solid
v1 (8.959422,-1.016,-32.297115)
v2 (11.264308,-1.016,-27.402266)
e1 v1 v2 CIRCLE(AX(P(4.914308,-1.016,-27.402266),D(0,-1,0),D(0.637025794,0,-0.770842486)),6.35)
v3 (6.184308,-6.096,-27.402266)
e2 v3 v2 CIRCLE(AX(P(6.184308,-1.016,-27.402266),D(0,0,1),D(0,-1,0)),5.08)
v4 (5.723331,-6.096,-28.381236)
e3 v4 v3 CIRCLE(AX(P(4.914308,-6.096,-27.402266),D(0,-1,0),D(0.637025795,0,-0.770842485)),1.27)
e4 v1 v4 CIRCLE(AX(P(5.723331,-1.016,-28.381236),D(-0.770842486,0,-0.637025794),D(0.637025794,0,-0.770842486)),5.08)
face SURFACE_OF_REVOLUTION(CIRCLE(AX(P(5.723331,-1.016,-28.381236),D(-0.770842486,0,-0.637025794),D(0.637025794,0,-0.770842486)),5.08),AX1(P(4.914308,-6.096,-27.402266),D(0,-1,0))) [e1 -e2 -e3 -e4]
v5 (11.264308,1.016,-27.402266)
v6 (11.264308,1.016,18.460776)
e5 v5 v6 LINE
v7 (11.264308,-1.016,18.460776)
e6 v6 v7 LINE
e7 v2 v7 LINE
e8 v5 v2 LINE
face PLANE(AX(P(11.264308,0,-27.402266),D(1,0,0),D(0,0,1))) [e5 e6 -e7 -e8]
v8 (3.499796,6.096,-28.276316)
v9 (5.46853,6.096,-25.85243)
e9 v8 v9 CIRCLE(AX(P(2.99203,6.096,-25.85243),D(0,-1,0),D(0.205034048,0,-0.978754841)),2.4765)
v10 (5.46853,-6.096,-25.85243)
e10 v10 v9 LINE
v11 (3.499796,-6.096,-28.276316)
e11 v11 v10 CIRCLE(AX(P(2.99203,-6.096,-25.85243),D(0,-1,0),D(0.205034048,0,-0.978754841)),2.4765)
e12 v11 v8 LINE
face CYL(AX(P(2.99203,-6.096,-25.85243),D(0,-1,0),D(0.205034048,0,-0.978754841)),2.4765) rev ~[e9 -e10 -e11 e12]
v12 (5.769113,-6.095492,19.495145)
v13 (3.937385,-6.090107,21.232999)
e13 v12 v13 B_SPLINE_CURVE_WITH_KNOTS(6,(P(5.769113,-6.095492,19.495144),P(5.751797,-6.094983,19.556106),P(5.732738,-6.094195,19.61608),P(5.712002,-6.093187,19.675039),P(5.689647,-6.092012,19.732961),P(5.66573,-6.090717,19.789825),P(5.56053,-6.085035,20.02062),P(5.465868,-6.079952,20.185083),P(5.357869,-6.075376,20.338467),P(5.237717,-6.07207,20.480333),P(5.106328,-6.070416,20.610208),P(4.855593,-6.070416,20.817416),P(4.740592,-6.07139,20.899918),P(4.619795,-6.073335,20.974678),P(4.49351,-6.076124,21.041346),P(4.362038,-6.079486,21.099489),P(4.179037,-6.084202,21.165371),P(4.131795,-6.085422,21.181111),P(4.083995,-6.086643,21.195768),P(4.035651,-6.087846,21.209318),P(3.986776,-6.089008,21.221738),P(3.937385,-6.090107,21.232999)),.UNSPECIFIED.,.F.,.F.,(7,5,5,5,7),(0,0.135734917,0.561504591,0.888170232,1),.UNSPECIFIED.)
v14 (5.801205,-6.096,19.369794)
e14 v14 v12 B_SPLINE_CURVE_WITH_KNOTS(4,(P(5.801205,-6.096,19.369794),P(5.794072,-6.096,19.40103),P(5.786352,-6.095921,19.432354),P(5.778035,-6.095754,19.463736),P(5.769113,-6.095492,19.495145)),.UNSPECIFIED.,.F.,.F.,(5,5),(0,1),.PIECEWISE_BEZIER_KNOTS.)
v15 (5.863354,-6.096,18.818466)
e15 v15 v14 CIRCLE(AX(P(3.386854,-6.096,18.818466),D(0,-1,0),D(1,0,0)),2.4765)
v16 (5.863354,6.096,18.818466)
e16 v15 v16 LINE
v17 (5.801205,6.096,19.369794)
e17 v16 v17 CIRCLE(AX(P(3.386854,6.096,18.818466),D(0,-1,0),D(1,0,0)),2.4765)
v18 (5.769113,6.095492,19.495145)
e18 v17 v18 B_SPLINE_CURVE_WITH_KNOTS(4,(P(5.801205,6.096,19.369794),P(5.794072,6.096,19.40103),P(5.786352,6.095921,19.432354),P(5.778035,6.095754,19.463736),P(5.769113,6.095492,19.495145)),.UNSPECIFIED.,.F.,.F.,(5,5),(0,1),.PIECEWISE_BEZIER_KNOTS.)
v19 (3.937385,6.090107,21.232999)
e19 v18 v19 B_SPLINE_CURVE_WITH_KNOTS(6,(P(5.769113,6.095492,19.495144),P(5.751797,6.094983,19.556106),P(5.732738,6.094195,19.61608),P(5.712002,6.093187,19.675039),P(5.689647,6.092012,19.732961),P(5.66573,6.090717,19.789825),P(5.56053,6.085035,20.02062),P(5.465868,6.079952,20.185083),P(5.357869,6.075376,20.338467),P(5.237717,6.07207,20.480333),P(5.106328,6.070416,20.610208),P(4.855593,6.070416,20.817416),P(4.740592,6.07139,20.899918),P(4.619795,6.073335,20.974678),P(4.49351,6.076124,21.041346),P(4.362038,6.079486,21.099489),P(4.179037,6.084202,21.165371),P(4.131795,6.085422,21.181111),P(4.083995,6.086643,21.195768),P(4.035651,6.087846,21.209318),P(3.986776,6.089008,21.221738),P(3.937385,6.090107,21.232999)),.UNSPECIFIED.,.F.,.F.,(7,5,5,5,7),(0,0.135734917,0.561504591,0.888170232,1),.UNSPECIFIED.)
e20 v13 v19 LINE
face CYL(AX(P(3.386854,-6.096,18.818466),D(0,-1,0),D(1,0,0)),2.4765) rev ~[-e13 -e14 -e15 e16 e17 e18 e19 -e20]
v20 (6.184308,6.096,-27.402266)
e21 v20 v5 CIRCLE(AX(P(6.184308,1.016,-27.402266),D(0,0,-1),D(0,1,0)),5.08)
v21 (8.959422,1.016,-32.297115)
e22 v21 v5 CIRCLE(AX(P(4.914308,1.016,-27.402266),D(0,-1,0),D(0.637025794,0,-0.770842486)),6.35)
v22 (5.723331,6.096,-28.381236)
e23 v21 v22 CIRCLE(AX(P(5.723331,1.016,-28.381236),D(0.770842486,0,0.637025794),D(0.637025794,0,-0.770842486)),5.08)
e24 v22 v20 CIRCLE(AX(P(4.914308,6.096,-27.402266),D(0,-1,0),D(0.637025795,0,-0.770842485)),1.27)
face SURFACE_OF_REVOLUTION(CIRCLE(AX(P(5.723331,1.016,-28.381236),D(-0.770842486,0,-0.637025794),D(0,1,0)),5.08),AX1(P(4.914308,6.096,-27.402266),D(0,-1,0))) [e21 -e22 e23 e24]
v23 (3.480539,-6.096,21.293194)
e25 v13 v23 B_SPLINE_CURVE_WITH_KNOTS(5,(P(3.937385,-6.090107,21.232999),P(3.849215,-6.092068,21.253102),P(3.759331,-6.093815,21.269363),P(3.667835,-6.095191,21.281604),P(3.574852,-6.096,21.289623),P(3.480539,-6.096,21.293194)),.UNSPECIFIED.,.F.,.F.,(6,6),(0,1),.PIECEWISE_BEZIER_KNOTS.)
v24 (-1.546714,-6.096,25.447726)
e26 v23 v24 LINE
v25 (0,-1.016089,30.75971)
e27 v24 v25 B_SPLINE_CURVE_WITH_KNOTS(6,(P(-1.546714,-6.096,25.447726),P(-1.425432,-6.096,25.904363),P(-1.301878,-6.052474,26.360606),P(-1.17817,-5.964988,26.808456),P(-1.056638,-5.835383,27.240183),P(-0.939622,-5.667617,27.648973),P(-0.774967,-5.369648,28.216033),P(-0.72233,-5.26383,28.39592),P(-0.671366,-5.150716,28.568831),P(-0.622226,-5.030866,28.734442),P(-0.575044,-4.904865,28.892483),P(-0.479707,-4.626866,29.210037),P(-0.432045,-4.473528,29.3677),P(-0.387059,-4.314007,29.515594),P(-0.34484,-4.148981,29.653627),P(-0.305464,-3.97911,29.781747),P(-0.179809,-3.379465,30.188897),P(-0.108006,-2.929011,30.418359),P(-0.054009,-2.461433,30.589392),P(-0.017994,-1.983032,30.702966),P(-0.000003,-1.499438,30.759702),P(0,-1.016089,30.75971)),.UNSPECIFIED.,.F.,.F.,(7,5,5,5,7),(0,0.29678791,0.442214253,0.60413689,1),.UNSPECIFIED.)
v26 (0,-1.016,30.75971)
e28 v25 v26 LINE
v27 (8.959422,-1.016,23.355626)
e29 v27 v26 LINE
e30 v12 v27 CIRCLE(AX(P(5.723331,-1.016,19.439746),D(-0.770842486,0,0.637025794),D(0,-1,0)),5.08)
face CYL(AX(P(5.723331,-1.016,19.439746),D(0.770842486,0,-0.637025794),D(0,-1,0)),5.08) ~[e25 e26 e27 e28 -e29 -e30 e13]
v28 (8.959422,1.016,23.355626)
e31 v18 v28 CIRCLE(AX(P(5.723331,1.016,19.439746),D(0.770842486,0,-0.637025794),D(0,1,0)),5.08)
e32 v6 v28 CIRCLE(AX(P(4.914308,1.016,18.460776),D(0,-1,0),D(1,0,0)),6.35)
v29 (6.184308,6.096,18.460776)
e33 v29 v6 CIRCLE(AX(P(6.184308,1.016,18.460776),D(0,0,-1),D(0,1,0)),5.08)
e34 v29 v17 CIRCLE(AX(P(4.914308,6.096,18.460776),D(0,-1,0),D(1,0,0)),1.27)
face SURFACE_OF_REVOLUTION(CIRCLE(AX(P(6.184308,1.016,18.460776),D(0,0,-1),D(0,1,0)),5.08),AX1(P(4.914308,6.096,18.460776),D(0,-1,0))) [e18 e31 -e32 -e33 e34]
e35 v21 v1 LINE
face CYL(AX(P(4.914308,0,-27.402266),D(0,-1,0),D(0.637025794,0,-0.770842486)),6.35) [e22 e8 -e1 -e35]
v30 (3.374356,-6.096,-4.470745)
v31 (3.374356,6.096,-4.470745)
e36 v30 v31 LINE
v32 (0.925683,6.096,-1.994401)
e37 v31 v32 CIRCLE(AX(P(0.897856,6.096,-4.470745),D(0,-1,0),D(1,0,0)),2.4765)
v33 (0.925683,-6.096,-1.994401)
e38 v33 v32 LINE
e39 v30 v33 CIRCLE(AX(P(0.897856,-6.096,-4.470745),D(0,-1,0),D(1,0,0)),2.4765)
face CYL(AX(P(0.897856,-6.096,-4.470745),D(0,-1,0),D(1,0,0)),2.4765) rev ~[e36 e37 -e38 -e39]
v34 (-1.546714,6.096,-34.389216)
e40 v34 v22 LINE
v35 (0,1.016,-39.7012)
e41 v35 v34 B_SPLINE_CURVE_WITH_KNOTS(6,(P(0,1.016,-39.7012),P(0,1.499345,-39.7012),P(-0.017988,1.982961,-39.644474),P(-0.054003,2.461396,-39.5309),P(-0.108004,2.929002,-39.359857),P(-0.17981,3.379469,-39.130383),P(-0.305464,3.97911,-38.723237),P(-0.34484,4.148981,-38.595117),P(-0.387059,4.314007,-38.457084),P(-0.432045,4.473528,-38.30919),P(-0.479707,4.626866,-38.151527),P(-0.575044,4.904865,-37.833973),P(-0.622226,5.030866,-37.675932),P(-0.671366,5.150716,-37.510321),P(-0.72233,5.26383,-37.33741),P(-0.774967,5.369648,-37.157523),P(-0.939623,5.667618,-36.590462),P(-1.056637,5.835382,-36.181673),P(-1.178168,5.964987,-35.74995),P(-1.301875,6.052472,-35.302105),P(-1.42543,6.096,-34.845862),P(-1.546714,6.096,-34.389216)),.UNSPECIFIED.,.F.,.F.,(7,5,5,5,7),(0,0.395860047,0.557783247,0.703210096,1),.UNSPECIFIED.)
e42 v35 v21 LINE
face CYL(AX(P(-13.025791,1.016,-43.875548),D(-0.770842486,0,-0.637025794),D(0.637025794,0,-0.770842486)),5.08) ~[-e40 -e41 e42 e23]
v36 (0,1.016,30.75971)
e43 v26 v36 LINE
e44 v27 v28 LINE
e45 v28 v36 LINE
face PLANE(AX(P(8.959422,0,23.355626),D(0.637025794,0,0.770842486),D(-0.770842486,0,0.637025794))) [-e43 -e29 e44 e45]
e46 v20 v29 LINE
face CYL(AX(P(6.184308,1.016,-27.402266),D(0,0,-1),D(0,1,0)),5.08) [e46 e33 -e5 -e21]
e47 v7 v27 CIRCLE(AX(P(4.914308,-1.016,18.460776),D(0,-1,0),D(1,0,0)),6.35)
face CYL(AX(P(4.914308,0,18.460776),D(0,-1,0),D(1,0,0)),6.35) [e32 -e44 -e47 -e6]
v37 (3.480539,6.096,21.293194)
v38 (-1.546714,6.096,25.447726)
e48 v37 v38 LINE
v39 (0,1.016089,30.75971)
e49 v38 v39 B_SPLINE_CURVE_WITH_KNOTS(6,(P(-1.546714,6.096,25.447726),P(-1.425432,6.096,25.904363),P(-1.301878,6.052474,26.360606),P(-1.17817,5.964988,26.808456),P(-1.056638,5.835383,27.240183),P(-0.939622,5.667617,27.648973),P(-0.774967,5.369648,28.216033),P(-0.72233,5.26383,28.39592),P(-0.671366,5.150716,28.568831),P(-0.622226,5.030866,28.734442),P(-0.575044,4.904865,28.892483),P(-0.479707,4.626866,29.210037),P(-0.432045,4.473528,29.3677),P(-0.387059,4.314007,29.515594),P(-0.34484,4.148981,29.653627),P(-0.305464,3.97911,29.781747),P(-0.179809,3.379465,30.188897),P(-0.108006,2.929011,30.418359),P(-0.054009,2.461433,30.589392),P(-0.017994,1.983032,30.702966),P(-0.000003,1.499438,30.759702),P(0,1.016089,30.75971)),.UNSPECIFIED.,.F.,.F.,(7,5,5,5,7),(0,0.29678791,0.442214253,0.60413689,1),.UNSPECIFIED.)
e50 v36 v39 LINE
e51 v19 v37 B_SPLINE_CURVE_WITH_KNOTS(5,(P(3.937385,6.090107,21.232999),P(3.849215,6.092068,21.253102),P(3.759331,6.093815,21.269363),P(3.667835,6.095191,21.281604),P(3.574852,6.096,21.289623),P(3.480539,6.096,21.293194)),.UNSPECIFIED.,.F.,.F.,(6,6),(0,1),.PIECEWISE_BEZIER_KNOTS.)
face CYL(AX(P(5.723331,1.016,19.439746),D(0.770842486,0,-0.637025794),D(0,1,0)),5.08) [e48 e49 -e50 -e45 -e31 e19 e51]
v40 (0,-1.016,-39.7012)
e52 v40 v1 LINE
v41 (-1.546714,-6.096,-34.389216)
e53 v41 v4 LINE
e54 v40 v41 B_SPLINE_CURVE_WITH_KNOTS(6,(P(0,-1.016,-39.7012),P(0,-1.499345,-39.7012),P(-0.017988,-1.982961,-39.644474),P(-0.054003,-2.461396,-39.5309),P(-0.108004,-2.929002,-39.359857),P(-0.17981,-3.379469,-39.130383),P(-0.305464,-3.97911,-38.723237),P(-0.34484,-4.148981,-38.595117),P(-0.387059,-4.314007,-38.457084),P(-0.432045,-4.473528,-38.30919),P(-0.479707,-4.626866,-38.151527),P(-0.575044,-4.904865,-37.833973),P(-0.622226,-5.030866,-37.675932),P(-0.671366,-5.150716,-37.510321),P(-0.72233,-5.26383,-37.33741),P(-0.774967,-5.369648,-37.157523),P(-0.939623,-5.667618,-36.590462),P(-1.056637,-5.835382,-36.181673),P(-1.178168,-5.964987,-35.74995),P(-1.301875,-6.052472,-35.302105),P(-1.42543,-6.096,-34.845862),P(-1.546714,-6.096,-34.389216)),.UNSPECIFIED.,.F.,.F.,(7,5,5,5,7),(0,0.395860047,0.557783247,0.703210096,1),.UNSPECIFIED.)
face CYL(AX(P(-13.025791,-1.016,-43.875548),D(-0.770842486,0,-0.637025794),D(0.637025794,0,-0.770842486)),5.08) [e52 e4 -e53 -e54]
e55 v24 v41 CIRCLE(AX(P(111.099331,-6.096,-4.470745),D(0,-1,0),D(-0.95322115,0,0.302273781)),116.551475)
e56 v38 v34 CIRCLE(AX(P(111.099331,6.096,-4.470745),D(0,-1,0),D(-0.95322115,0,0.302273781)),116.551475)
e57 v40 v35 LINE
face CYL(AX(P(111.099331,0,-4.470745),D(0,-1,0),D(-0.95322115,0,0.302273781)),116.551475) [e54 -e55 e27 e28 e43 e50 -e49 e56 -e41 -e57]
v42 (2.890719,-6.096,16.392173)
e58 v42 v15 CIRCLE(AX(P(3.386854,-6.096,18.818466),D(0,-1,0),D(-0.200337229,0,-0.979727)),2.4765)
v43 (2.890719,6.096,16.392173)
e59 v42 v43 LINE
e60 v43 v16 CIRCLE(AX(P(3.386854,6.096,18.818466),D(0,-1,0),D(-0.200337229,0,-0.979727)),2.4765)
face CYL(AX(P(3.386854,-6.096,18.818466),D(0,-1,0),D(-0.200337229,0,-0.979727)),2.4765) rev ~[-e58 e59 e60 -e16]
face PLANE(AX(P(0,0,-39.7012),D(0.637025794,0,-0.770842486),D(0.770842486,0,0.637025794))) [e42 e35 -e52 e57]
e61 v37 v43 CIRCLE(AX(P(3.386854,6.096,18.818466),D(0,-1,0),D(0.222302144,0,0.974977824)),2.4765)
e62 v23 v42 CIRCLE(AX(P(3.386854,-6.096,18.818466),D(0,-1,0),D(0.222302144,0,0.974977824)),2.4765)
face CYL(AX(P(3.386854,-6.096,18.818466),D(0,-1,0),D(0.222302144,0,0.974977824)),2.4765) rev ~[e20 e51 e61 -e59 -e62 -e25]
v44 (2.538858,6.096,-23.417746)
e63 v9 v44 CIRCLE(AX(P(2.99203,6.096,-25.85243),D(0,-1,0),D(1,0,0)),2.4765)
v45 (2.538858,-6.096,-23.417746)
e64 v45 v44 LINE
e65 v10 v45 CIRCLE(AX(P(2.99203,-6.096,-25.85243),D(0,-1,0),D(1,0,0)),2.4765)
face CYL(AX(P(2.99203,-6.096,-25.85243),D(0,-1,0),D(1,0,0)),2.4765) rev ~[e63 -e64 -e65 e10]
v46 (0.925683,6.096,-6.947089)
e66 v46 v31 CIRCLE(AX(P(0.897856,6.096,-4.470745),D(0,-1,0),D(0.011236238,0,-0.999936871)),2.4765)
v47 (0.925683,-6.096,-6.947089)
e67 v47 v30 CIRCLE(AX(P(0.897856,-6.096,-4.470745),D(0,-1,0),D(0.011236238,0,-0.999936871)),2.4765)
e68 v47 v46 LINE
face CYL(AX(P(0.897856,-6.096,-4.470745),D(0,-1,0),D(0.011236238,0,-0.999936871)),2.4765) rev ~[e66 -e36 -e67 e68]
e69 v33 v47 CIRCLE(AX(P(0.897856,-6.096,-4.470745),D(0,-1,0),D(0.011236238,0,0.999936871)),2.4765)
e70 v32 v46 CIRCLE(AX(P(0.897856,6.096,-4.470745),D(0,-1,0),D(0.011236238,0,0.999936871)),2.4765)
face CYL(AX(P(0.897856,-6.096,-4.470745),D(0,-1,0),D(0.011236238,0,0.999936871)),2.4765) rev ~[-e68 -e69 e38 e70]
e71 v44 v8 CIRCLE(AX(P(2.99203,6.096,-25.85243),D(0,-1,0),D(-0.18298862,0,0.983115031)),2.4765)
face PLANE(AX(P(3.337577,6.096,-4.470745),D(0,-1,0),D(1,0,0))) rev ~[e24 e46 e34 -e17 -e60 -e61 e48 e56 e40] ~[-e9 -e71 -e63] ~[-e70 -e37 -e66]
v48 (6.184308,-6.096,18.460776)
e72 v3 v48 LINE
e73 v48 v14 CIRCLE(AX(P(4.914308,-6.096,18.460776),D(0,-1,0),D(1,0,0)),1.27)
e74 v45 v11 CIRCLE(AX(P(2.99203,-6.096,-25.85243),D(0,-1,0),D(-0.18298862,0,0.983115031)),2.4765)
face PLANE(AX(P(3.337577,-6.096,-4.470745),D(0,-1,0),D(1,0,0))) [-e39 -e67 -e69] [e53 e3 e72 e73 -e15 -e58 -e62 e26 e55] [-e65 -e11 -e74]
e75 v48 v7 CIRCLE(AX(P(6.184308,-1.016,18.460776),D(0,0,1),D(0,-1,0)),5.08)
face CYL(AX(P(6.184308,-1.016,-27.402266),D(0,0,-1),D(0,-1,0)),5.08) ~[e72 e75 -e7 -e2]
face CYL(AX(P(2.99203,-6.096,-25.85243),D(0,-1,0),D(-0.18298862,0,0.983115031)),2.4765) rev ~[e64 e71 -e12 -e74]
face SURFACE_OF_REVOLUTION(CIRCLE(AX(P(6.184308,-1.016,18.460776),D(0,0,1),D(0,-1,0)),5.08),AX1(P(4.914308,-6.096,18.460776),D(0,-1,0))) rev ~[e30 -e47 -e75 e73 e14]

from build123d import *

# Parameters (mm, degrees)
F1_DEPTH     = 6.096
F3_DEPTH     = 25.4
F4_T1_DEPTH  = 45.8630415712
F4_T3_DEPTH  = 24.3228960689
F4_T5_DEPTH  = 24.3228960689
F4_T8_ANGLE  = 50.429603728
F4_T10_ANGLE = 50.429603728
F4_T12_ANGLE = 50.429603728
F4_T14_ANGLE = 50.429603728


# Not quite as in the source:
# - a fillet or chamfer that OpenCascade refuses, or shapes differently, is made with other operations: its cross-section is extruded or revolved along the edge and cut away or added


with BuildPart() as f1:
    # F0 (on Front) → F1 (new body, symmetric)
    with BuildSketch(Plane.XZ):
        with BuildLine():
            Line((0, -39.7012000674), (8.9594220974, -32.2971154711))
            ThreePointArc((8.9594220974, -32.2971154711), (10.6592614203, -30.1074484367), (11.2643083058, -27.4022656866))
            Line((11.2643083058, -27.4022656866), (11.2643083058, 18.4607758846))
            ThreePointArc((11.2643083058, 18.4607758846), (10.6592614203, 21.1659586348), (8.9594220974, 23.3556256691))
            Line((8.9594220974, 23.3556256691), (0, 30.7597102655))
            ThreePointArc((0, 30.7597102655), (-5.4521439637, -4.470744901), (0, -39.7012000674))
        make_face()
    extrude(amount=F1_DEPTH, both=True)

    # F2 (on face) → F3 (cut)
    with BuildSketch(Plane.XZ.offset(6.096)):
        with BuildLine():
            ThreePointArc((5.8633539044, 18.8184664851), (5.322886305, 20.3627562227), (3.9373851632, 21.2329990657))
            ThreePointArc((3.9373851632, 21.2329990657), (3.3868539044, 18.8184664851), (2.8907187579, 16.3921725692))
            ThreePointArc((2.8907187579, 16.3921725692), (4.9527998741, 16.8999083103), (5.8633539044, 18.8184664851))
        make_face()
        with BuildLine():
            ThreePointArc((5.4685295173, -25.8524299357), (4.5748708681, -23.9477867911), (2.5388582003, -23.4177455604))
            ThreePointArc((2.5388582003, -23.4177455604), (2.9920295173, -25.8524299357), (3.4997963379, -28.2763162998))
            ThreePointArc((3.4997963379, -28.2763162998), (4.9143376067, -27.4137703405), (5.4685295173, -25.8524299357))
        make_face()
        with BuildLine():
            ThreePointArc((3.4997963379, -28.2763162998), (2.9920295173, -25.8524299357), (2.5388582003, -23.4177455604))
            ThreePointArc((2.5388582003, -23.4177455604), (0.5625907808, -26.3329293377), (3.4997963379, -28.2763162998))
        make_face()
        with BuildLine():
            ThreePointArc((3.3743560218, -4.470744901), (2.6588166523, -2.7294609185), (0.9256825651, -1.9944012387))
            ThreePointArc((0.9256825651, -1.9944012387), (0.8978560218, -4.470744901), (0.9256825651, -6.9470885632))
            ThreePointArc((0.9256825651, -6.9470885632), (2.6588166523, -6.2120288835), (3.3743560218, -4.470744901))
        make_face()
        with BuildLine():
            ThreePointArc((0.9256825651, -6.9470885632), (0.8978560218, -4.470744901), (0.9256825651, -1.9944012387))
            ThreePointArc((0.9256825651, -1.9944012387), (-1.5786439782, -4.470744901), (0.9256825651, -6.9470885632))
        make_face()
        with BuildLine():
            ThreePointArc((2.8907187579, 16.3921725692), (3.3868539044, 18.8184664851), (3.9373851632, 21.2329990657))
            ThreePointArc((3.9373851632, 21.2329990657), (0.9662878494, 19.3418327271), (2.8907187579, 16.3921725692))
        make_face()
    extrude(amount=-F3_DEPTH, mode=Mode.SUBTRACT)

    # F4: fillet of radius 5.08 on 10 edges, made by hand

    # F4_s2 → F4_t1 (cut)
    with BuildSketch(Plane.XY.offset(-27.4022656866)):
        with BuildLine():
            ThreePointArc((6.1843083058, -6.096), (9.7764107542, -4.6081024484), (11.2643083058, -1.016))
            Line((11.2643083058, -1.016), (11.2643083058, -6.096))
            Line((11.2643083058, -6.096), (6.1843083058, -6.096))
        make_face()
        with BuildLine():
            ThreePointArc((6.1843083058, 6.096), (9.7764107542, 4.6081024484), (11.2643083058, 1.016))
            Line((11.2643083058, 1.016), (11.2643083058, 6.096))
            Line((11.2643083058, 6.096), (6.1843083058, 6.096))
        make_face()
    extrude(amount=F4_T1_DEPTH, mode=Mode.SUBTRACT)

    # F4_s4 → F4_t3 (cut)
    with BuildSketch(Plane(origin=(-29.284836754, 0, -24.2010485008), x_dir=(0, 1, 0), z_dir=(0.7708424857, 0, 0.637025794))):
        with BuildLine():
            ThreePointArc((1.016, -30.6033717472), (4.6081024484, -29.1154741956), (6.096, -25.5233717472))
            Line((6.096, -25.5233717472), (6.096, -30.6033717472))
            Line((6.096, -30.6033717472), (1.016, -30.6033717472))
        make_face()
        with BuildLine():
            ThreePointArc((-1.016, -30.6033717472), (-4.6081024484, -29.1154741956), (-6.096, -25.5233717472))
            Line((-6.096, -25.5233717472), (-6.096, -30.6033717472))
            Line((-6.096, -30.6033717472), (-1.016, -30.6033717472))
        make_face()
    extrude(amount=F4_T3_DEPTH, mode=Mode.SUBTRACT)

    # F4_s6 → F4_t5 (cut)
    with BuildSketch(Plane(origin=(-6.1450273998, 0, 5.078263109), x_dir=(0, 1, 0), z_dir=(-0.7708424857, 0, 0.637025794))):
        with BuildLine():
            ThreePointArc((6.096, -18.630891522), (4.6081024484, -22.2229939704), (1.016, -23.710891522))
            Line((1.016, -23.710891522), (6.096, -23.710891522))
            Line((6.096, -23.710891522), (6.096, -18.630891522))
        make_face()
        with BuildLine():
            ThreePointArc((-6.096, -18.630891522), (-4.6081024484, -22.2229939704), (-1.016, -23.710891522))
            Line((-1.016, -23.710891522), (-6.096, -23.710891522))
            Line((-6.096, -23.710891522), (-6.096, -18.630891522))
        make_face()
    extrude(amount=F4_T5_DEPTH, mode=Mode.SUBTRACT)

    # F4_s7 → F4_t8 (revolve, cut)
    with BuildSketch(Plane(origin=(-10.5357150876, 0, -8.7067363212), x_dir=(0, 1, 0), z_dir=(-0.7708424857, 0, -0.637025794))):
        with BuildLine():
            ThreePointArc((6.096, 25.5233717472), (4.6081024484, 29.1154741956), (1.016, 30.6033717472))
            Line((1.016, 30.6033717472), (6.096, 30.6033717472))
            Line((6.096, 30.6033717472), (6.096, 25.5233717472))
        make_face()
    revolve(axis=Axis((4.9143083058, 6.096, -27.4022656866), (0, -1, 0)), revolution_arc=F4_T8_ANGLE, mode=Mode.SUBTRACT)

    # F4_s9 → F4_t10 (revolve, cut)
    with BuildSketch(Plane.XY.offset(18.4607758846)):
        with BuildLine():
            ThreePointArc((6.1843083058, 6.096), (9.7764107542, 4.6081024484), (11.2643083058, 1.016))
            Line((11.2643083058, 1.016), (11.2643083058, 6.096))
            Line((11.2643083058, 6.096), (6.1843083058, 6.096))
        make_face()
    revolve(axis=Axis((4.9143083058, 6.096, 18.4607758846), (0, -1, 0)), revolution_arc=F4_T10_ANGLE, mode=Mode.SUBTRACT)

    # F4_s11 → F4_t12 (revolve, cut)
    with BuildSketch(Plane(origin=(-10.5357150876, 0, -8.7067363212), x_dir=(0, 1, 0), z_dir=(-0.7708424857, 0, -0.637025794))):
        with BuildLine():
            ThreePointArc((-1.016, 30.6033717472), (-4.6081024484, 29.1154741956), (-6.096, 25.5233717472))
            Line((-6.096, 25.5233717472), (-6.096, 30.6033717472))
            Line((-6.096, 30.6033717472), (-1.016, 30.6033717472))
        make_face()
    revolve(axis=Axis((4.9143083058, -6.096, -27.4022656866), (0, -1, 0)), revolution_arc=F4_T12_ANGLE, mode=Mode.SUBTRACT)

    # F4_s13 → F4_t14 (revolve, cut)
    with BuildSketch(Plane.XY.offset(18.4607758846)):
        with BuildLine():
            ThreePointArc((6.1843083058, -6.096), (9.7764107542, -4.6081024484), (11.2643083058, -1.016))
            Line((11.2643083058, -1.016), (11.2643083058, -6.096))
            Line((11.2643083058, -6.096), (6.1843083058, -6.096))
        make_face()
    revolve(axis=Axis((4.9143083058, -6.096, 18.4607758846), (0, -1, 0)), revolution_arc=F4_T14_ANGLE, mode=Mode.SUBTRACT)


solid = f1.part
